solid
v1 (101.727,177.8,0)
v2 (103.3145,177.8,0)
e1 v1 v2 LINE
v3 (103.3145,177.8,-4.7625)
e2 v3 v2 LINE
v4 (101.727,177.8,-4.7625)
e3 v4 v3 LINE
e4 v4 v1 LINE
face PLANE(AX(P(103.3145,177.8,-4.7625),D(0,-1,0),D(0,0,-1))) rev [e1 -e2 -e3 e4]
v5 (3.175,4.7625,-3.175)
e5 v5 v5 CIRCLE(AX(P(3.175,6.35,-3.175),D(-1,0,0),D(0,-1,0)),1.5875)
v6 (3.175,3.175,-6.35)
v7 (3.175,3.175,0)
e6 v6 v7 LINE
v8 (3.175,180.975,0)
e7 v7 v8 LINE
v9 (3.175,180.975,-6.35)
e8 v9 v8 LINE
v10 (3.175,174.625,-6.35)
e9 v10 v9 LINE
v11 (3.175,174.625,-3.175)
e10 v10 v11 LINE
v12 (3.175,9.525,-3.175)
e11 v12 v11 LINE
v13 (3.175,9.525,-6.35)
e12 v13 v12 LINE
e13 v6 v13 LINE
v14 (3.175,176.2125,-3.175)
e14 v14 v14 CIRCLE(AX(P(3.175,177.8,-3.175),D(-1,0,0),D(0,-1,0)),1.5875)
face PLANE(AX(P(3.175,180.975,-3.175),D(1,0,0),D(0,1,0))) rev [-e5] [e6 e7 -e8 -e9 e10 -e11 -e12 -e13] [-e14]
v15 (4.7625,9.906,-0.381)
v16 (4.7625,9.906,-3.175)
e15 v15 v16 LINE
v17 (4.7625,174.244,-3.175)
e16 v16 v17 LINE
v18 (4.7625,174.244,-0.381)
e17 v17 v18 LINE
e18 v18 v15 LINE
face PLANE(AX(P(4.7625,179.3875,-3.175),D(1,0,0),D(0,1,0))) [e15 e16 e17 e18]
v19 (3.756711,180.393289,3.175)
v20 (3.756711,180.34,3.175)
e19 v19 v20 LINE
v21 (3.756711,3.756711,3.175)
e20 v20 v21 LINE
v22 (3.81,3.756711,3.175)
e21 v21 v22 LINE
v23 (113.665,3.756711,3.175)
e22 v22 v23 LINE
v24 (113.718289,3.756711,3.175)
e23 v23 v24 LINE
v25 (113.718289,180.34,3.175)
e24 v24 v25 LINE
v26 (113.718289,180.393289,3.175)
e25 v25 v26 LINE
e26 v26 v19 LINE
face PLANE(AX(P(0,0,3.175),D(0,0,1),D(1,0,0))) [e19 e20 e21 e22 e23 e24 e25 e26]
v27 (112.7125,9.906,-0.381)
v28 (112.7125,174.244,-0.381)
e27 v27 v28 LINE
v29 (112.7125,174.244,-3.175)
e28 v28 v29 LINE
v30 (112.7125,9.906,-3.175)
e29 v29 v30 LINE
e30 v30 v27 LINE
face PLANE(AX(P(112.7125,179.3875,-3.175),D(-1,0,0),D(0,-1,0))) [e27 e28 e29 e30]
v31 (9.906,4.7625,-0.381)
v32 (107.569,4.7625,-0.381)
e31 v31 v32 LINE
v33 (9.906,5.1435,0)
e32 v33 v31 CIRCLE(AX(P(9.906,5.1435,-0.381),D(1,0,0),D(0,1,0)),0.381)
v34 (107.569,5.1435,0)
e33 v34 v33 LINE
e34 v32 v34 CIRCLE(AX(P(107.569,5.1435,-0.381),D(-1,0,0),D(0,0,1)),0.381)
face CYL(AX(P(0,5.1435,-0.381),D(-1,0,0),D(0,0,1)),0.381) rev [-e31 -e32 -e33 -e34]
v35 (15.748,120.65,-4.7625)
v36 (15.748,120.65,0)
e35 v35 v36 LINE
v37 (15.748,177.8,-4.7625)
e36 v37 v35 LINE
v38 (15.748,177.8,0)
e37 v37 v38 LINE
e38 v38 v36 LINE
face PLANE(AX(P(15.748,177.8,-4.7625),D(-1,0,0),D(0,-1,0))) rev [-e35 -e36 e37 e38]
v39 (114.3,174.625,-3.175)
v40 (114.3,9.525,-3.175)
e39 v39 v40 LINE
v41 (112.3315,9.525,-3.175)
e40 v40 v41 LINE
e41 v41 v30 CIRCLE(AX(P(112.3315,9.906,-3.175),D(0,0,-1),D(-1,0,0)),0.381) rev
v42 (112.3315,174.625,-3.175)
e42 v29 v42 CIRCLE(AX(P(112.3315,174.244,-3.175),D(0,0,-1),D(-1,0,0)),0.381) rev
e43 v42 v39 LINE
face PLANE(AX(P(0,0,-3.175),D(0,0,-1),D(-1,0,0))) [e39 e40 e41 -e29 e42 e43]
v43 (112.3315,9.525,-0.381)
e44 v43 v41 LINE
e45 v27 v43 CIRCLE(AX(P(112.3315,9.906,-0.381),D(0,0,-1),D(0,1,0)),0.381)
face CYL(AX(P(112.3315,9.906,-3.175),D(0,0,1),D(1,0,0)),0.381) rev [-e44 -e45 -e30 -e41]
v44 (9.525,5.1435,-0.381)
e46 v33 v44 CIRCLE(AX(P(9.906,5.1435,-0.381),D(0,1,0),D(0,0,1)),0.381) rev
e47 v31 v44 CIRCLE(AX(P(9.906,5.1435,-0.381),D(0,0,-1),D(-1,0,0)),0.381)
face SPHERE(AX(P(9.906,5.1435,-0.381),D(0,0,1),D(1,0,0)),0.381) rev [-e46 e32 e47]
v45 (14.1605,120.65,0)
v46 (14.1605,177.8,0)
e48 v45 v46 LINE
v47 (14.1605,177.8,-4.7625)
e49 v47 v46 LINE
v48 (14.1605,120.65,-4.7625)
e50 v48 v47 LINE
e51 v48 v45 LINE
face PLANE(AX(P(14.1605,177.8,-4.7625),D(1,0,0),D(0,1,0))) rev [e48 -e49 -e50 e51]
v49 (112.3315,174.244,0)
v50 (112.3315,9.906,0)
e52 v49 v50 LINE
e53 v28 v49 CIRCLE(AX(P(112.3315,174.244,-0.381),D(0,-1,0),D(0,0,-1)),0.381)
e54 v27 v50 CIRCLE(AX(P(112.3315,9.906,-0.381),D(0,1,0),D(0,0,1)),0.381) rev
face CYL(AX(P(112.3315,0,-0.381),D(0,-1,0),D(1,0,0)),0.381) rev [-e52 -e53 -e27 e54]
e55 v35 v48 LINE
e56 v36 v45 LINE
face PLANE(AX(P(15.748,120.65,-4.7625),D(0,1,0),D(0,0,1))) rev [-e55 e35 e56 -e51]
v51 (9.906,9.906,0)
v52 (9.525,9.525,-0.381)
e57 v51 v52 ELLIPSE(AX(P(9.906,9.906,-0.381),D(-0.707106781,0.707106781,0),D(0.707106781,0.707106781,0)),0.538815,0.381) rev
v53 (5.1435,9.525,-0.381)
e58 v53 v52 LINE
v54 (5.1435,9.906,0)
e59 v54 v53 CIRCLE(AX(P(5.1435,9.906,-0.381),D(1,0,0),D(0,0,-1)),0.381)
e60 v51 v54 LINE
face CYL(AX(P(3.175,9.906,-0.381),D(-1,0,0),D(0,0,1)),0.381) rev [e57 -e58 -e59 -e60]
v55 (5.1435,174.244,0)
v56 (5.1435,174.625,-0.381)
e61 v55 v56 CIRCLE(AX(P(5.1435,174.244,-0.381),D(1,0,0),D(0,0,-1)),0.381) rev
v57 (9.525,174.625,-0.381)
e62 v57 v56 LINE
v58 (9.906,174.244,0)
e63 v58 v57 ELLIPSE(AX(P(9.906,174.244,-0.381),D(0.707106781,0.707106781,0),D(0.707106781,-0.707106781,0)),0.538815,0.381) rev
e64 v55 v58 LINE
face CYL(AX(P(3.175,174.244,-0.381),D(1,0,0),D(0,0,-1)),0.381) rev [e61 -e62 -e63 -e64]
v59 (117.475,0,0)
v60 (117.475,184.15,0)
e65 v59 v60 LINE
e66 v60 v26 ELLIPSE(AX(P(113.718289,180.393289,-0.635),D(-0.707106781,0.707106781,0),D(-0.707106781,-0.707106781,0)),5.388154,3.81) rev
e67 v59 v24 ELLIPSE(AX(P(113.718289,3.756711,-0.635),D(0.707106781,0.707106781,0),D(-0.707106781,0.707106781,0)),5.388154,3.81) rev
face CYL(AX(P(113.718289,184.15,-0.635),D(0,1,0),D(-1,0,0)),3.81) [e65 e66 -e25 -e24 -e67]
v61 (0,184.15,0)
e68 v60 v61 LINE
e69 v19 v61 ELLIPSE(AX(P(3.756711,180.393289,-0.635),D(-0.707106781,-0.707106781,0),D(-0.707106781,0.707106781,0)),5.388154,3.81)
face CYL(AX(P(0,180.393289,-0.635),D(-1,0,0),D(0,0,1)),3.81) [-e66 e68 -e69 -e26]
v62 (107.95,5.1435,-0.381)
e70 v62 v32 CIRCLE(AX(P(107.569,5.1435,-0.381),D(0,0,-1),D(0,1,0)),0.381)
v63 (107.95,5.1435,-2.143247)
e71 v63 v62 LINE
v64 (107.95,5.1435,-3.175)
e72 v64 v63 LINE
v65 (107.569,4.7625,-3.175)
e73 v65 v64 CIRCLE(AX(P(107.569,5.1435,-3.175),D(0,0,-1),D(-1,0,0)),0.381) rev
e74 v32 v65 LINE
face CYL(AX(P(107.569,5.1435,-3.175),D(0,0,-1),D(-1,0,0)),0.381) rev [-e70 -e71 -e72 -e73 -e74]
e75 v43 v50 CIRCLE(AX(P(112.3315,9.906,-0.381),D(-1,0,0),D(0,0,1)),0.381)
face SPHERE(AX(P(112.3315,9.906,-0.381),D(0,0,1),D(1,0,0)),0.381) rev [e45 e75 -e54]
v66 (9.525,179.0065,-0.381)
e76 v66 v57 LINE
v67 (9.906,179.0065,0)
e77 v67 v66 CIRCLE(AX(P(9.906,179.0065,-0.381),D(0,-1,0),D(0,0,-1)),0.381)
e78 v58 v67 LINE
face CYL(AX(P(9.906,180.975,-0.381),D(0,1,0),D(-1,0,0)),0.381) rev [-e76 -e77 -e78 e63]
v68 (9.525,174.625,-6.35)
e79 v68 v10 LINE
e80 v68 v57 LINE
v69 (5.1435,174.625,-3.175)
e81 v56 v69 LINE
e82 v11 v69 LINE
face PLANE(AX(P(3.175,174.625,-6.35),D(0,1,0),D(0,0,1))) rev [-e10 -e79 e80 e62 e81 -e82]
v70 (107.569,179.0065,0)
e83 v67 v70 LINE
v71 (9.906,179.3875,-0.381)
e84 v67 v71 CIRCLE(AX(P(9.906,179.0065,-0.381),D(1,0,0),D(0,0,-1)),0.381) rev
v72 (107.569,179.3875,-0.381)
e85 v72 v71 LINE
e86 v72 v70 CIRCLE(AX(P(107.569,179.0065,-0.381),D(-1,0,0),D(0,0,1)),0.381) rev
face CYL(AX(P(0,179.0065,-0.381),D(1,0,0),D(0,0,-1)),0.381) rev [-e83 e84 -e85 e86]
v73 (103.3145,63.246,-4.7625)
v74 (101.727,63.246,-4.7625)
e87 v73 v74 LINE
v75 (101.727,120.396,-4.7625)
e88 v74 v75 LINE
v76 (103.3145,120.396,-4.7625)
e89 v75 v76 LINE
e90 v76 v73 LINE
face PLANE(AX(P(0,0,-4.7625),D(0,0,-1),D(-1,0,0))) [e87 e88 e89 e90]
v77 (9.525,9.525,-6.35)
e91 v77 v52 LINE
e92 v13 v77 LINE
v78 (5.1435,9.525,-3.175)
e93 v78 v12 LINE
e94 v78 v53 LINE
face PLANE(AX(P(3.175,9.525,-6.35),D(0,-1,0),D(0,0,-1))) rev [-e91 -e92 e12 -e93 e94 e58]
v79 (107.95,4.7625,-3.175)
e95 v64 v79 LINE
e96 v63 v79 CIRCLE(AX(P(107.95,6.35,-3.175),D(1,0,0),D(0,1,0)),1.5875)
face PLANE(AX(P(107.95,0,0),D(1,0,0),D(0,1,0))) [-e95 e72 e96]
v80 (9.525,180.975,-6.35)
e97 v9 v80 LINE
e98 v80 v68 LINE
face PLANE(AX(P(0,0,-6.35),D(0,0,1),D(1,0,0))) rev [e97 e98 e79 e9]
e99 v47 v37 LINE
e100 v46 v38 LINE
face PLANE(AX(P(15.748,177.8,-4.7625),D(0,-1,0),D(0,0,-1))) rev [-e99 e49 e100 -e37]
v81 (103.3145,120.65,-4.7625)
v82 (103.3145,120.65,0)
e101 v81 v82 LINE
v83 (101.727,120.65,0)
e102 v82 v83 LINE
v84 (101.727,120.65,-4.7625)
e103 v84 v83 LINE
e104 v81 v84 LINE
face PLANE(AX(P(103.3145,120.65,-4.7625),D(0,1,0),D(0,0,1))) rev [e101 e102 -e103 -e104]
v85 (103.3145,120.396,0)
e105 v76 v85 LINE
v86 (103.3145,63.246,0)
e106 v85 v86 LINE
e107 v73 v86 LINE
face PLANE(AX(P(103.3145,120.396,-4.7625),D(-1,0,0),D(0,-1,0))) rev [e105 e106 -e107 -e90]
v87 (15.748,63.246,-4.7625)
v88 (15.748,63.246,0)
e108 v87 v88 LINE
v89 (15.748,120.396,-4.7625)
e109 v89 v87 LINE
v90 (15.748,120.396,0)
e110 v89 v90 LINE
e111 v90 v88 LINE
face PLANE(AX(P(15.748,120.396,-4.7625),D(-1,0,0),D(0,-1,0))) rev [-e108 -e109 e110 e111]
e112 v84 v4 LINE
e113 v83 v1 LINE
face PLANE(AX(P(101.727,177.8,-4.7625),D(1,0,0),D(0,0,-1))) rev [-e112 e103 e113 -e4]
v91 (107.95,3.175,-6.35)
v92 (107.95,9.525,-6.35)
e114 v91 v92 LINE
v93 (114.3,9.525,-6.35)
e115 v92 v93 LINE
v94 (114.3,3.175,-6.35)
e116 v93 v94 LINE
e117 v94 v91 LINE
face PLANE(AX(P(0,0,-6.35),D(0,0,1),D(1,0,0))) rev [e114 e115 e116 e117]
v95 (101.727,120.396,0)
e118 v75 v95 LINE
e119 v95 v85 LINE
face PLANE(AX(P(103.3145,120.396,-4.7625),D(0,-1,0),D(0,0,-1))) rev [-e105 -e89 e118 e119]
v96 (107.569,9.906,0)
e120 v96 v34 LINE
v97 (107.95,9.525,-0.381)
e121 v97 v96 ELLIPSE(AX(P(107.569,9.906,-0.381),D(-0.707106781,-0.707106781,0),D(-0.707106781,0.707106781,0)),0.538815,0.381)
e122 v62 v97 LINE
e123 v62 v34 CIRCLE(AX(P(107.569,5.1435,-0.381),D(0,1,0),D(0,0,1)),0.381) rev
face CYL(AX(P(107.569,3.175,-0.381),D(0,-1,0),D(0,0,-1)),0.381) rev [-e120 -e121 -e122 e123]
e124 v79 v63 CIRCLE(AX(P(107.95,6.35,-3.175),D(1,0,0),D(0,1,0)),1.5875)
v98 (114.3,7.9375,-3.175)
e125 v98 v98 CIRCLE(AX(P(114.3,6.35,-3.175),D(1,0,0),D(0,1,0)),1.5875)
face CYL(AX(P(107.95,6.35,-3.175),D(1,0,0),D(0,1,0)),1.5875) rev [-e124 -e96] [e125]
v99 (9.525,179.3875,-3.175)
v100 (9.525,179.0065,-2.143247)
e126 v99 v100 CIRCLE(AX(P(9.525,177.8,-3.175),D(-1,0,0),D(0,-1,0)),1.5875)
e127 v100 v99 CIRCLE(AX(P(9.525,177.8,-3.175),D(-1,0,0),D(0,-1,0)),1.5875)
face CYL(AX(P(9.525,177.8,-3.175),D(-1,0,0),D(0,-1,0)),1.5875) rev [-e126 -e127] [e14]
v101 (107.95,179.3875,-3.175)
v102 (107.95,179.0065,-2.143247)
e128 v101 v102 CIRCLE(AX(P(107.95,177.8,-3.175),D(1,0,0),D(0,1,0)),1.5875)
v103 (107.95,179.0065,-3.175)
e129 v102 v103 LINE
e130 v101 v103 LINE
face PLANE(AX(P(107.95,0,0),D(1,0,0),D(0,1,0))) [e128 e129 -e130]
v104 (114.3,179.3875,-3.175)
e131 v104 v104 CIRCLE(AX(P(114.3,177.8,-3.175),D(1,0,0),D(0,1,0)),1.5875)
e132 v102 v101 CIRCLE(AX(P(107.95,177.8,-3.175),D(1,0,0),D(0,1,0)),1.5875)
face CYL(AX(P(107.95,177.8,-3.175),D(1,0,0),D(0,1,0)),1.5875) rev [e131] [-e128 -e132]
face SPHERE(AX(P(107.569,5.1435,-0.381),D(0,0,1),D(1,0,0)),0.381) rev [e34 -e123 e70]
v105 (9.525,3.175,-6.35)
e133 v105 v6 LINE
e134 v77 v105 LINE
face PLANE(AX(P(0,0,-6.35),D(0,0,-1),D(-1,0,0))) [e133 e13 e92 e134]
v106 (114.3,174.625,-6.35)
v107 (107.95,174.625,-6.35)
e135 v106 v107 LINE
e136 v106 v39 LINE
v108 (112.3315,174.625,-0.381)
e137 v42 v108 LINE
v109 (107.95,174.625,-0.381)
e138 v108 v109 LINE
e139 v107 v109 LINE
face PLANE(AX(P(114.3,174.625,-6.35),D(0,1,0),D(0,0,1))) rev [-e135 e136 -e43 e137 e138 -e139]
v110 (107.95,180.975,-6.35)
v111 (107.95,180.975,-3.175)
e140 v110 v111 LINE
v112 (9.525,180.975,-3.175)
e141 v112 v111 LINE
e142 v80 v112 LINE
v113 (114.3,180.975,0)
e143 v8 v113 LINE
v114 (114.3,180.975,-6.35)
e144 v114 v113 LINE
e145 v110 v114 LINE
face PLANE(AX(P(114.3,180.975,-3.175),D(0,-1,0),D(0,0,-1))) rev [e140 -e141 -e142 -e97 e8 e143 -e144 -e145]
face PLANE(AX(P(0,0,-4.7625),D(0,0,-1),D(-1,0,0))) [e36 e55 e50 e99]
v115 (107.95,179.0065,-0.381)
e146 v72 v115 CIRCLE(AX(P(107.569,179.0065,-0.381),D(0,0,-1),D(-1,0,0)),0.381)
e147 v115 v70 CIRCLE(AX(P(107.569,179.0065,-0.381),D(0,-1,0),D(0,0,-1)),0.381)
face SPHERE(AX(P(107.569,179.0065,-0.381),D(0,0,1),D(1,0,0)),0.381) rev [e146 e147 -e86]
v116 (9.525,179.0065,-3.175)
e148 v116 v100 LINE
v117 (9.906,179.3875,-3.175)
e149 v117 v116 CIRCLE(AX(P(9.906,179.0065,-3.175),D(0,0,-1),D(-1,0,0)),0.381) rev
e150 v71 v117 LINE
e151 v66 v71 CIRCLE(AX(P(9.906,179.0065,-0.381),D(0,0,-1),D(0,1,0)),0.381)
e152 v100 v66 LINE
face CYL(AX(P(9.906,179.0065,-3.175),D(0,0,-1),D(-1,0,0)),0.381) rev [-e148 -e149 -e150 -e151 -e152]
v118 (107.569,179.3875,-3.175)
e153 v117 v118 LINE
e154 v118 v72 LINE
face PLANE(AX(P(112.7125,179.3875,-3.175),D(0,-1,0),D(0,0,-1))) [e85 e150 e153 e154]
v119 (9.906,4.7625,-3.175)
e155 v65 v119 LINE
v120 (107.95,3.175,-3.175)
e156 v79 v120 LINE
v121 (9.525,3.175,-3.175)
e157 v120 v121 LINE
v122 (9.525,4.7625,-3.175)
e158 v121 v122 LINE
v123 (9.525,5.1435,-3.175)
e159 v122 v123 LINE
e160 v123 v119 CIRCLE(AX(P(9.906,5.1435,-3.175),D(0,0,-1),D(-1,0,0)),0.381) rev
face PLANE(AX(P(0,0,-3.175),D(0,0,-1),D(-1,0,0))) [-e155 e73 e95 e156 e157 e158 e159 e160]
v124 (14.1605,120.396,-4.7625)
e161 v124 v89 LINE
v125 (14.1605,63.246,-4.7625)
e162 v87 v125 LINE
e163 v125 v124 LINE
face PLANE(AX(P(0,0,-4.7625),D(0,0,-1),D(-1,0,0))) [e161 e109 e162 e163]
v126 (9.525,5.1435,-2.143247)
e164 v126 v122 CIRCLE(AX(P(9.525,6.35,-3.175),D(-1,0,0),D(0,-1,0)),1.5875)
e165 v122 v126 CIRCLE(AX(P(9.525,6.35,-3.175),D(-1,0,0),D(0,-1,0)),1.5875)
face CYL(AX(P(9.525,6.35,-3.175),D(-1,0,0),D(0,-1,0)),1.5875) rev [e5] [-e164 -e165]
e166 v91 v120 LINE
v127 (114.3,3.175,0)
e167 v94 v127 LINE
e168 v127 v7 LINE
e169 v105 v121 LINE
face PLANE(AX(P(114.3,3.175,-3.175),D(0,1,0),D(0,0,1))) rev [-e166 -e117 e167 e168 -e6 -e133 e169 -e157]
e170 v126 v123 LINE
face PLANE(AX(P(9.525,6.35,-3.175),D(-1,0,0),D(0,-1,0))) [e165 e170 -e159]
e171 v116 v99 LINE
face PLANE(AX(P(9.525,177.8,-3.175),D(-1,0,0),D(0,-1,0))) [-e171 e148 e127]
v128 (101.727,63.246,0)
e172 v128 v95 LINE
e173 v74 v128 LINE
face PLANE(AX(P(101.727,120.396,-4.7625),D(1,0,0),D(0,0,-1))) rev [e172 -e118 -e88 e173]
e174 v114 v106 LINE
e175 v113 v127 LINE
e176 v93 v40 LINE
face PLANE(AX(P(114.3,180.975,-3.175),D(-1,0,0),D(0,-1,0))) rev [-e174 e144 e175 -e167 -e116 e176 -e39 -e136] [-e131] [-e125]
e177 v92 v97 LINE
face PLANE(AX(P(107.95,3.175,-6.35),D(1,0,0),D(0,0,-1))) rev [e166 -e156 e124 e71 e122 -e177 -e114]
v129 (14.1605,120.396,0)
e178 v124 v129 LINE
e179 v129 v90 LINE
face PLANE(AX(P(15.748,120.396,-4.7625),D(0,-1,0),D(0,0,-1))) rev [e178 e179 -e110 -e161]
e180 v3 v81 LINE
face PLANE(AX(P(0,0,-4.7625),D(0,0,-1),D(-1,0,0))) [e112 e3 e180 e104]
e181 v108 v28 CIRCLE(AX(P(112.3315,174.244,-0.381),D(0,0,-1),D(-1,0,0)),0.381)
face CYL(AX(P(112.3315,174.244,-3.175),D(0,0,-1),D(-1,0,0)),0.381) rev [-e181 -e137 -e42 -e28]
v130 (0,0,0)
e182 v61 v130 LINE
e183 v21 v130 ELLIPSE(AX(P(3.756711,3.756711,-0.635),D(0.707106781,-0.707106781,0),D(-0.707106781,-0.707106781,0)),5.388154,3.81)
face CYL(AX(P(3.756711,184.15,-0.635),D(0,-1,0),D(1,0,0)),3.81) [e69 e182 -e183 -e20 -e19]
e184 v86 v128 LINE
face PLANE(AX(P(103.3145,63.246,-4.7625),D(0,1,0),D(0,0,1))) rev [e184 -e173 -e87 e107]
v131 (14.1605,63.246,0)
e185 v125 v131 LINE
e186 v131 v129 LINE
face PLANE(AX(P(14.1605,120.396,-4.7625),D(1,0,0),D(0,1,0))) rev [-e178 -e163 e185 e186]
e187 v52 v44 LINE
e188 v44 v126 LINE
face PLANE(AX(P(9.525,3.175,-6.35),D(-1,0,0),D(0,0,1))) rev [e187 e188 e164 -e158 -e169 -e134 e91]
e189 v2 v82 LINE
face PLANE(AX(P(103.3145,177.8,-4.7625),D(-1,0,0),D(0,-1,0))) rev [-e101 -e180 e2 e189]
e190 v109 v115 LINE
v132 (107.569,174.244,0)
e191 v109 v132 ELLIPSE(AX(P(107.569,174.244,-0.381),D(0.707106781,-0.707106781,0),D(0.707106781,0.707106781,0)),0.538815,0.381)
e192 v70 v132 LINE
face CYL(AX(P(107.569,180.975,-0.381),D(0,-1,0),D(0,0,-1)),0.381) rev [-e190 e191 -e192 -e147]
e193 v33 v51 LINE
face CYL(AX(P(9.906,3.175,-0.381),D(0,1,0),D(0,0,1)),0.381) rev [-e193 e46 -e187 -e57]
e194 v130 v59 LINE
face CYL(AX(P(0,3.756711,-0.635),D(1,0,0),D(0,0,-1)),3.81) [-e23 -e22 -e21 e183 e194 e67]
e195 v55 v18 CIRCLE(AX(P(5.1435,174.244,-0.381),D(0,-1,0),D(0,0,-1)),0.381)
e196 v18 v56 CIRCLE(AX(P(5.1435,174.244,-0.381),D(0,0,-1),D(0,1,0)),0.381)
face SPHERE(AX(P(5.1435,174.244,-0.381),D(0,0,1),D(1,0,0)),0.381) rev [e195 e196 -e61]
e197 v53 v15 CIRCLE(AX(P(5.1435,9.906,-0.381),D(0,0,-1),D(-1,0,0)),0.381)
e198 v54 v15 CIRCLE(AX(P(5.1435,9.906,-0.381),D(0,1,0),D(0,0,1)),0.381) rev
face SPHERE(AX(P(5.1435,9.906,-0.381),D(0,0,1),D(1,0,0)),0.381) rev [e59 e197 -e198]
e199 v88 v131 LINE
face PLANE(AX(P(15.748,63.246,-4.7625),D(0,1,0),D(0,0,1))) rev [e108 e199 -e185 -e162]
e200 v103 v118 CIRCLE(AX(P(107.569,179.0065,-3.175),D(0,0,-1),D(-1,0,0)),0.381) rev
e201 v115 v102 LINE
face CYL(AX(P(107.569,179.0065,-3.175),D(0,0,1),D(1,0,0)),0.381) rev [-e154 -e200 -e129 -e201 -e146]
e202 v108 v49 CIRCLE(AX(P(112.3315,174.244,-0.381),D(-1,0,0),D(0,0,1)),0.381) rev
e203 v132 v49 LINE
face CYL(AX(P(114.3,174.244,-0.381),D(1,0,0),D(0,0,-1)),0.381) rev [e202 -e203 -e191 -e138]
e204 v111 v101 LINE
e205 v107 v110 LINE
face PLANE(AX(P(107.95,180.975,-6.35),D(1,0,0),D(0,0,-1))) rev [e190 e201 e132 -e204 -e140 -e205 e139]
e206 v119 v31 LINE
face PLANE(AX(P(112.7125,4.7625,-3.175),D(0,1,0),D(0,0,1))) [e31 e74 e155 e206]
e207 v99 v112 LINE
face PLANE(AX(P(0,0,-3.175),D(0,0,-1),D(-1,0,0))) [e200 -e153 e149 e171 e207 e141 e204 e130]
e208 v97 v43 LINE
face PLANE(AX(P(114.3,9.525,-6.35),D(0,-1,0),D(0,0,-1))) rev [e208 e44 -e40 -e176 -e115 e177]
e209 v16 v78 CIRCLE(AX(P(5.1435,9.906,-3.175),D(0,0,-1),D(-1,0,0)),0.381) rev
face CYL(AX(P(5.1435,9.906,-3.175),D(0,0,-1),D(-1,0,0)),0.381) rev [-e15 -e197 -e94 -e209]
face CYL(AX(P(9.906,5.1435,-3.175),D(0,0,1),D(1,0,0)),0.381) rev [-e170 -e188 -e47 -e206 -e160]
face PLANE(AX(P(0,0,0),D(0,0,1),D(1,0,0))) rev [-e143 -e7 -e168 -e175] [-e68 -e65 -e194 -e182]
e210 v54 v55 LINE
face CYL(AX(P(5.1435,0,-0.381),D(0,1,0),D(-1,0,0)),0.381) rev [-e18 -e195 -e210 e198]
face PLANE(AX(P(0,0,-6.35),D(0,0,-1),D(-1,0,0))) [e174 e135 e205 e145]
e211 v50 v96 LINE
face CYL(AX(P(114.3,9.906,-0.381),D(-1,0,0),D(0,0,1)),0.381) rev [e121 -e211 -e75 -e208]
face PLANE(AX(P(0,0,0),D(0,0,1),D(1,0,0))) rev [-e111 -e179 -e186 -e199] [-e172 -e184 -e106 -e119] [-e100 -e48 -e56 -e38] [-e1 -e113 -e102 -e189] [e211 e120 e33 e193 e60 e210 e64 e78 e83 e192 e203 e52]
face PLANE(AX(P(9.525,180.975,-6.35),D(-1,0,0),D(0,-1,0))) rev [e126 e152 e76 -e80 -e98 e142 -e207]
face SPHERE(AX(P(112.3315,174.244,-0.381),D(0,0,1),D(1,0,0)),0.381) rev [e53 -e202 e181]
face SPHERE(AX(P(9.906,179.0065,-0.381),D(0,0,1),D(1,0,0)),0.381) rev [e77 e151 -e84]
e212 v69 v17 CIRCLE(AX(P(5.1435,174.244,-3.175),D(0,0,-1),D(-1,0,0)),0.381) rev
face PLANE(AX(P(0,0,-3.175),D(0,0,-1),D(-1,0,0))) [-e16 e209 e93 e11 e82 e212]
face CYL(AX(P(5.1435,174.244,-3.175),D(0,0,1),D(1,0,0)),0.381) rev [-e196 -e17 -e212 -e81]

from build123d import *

# Parameters (mm, degrees)
SKETCH3_W           = 117.475
SKETCH3_H           = 184.15
BOSS_EXTRUDE2_DEPTH = 3.175
FILLET1_R           = 3.81
SKETCH13_W          = 111.125
SKETCH13_H          = 177.8
SKETCH13_W_2        = 107.95
SKETCH13_H_2        = 174.625
BOSS_EXTRUDE4_DEPTH = 3.175
SKETCH14_W          = 6.35
SKETCH14_H          = 6.35
BOSS_EXTRUDE5_DEPTH = 6.35
FILLET9_R           = 0.381
SKETCH15_R          = 1.5875
CUT_EXTRUDE9_DEPTH  = 6.35
CUT_EXTRUDE10_START = -6.35
SKETCH16_R          = 1.5875
CUT_EXTRUDE10_DEPTH = 6.35
SKETCH17_W          = 1.5875
SKETCH17_H          = 57.15
BOSS_EXTRUDE6_DEPTH = 4.7625
SKETCH18_W          = 1.5875
SKETCH18_H          = 57.15
BOSS_EXTRUDE7_DEPTH = 4.7625


with BuildPart() as part:
    # Sketch3 → Boss-Extrude2 (new body)
    with BuildSketch(Plane.XY):
        with Locations((58.7375, 92.075)):
            Rectangle(SKETCH3_W, SKETCH3_H)
    extrude(amount=BOSS_EXTRUDE2_DEPTH)

    # Fillet1
    # the kernel refuses this fillet: 3.81 mm, written as the material it takes off along each edge
    with BuildSketch(Plane(origin=(126.866776656, 0, 3.175), x_dir=(0, 0, -1), z_dir=(-1, 0, 0)), Plane(origin=(-9.391776656, 184.15, 3.175), x_dir=(0, 0, -1), z_dir=(1, 0, 0))) as fillet1_piece_1:
        with BuildLine():
            CenterArc((3.81, -3.756710662), FILLET1_R, 99.594068227, 80.405931773)
            Line((0, -3.756710662), (-0.0762, -3.756710662))
            Line((-0.0762, -3.756710662), (-0.0762, 0))
            Line((-0.0762, 0), (0, 0.0762))
            ThreePointArc((0, 0.0762), (1.5875, 0.0762), (3.1623, 0.075134213))
            Line((3.1623, 0.075134213), (3.175, 0))
        make_face()
    extrude(amount=136.258553311, mode=Mode.SUBTRACT)
    with BuildSketch(Plane(origin=(117.475, 193.541776656, 3.175), x_dir=(0, 0, -1), z_dir=(0, -1, 0)), Plane(origin=(0, -9.391776656, 3.175), x_dir=(0, 0, -1), z_dir=(0, 1, 0))) as fillet1_piece_2:
        with BuildLine():
            CenterArc((3.81, -3.756710662), FILLET1_R, 99.594068227, 80.405931773)
            Line((0, -3.756710662), (-0.0762, -3.756710662))
            Line((-0.0762, -3.756710662), (-0.0762, 0))
            Line((-0.0762, 0), (0, 0.0762))
            ThreePointArc((0, 0.0762), (1.5875, 0.0762), (3.1623, 0.075134213))
            Line((3.1623, 0.075134213), (3.175, 0))
        make_face()
    extrude(amount=202.933553311, mode=Mode.SUBTRACT)

    # Sketch13 → Boss-Extrude4 (add)
    with BuildSketch(Plane(origin=(0, 0, 0), x_dir=(-1, 0, 0), z_dir=(0, 0, -1))):
        with Locations((-58.7375, 92.075)):
            Rectangle(SKETCH13_W, SKETCH13_H)
        with Locations((-58.7375, 92.075)):
            Rectangle(SKETCH13_W_2, SKETCH13_H_2, mode=Mode.SUBTRACT)
    extrude(amount=BOSS_EXTRUDE4_DEPTH)

    # Sketch14 → Boss-Extrude5 (add)
    with BuildSketch(Plane(origin=(0, 0, 0), x_dir=(-1, 0, 0), z_dir=(0, 0, -1))):
        with Locations((-111.125, 177.8)):
            Rectangle(SKETCH14_W, SKETCH14_H)
        with Locations((-6.35, 177.8)):
            Rectangle(SKETCH14_W, SKETCH14_H)
        with Locations((-111.125, 6.35)):
            Rectangle(SKETCH14_W, SKETCH14_H)
        with Locations((-6.35, 6.35)):
            Rectangle(SKETCH14_W, SKETCH14_H)
    extrude(amount=BOSS_EXTRUDE5_DEPTH)

    # Fillet9
    fillet9_edges = [part.edges().sort_by_distance(p)[0] for p in [
        (107.95, 7.14375, 0),
        (110.33125, 9.525, 0),
        (4.7625, 92.075, 0),
        (9.525, 4.7625, -1.5875),
        (4.7625, 9.525, -1.5875),
        (7.14375, 9.525, 0),
        (9.525, 7.14375, 0),
        (112.7125, 92.075, 0),
        (110.33125, 174.625, 0),
        (112.7125, 174.625, -1.5875),
        (107.95, 179.3875, -1.5875),
        (107.95, 177.00625, 0),
        (4.7625, 174.625, -1.5875),
        (58.7375, 179.3875, 0),
        (9.525, 179.3875, -1.5875),
        (9.525, 177.00625, 0),
        (7.14375, 174.625, 0),
        (58.7375, 4.7625, 0),
        (107.95, 4.7625, -1.5875),
        (112.7125, 9.525, -1.5875),
    ]]
    fillet(fillet9_edges, radius=FILLET9_R)

    # Sketch15 → Cut-Extrude9 (cut)
    with BuildSketch(Plane(origin=(114.3, 0, 0), x_dir=(0, 0, -1), z_dir=(1, 0, 0))):
        with Locations(Location((3.175, 6.35, 0), (0, 0, 90))):
            Circle(SKETCH15_R)
        with Locations(Location((3.175, 177.8, 0), (0, 0, 90))):
            Circle(SKETCH15_R)
    extrude(amount=-CUT_EXTRUDE9_DEPTH, mode=Mode.SUBTRACT)

    # Sketch16 → Cut-Extrude10 (cut)
    with BuildSketch(Plane.ZY.offset(-3.175).offset(CUT_EXTRUDE10_START)):
        with Locations(Location((-3.175, 177.8, 0), (0, 0, 90))):
            Circle(SKETCH16_R)
        with Locations(Location((-3.175, 6.35, 0), (0, 0, 90))):
            Circle(SKETCH16_R)
    extrude(amount=CUT_EXTRUDE10_DEPTH, mode=Mode.SUBTRACT)

    # Sketch17 → Boss-Extrude6 (add)
    with BuildSketch(Plane(origin=(0, 0, 0), x_dir=(-1, 0, 0), z_dir=(0, 0, -1))):
        with Locations((-102.52075, 149.225)):
            Rectangle(SKETCH17_W, SKETCH17_H)
        with Locations((-14.95425, 149.225)):
            Rectangle(SKETCH17_W, SKETCH17_H)
    extrude(amount=BOSS_EXTRUDE6_DEPTH)

    # Sketch18 → Boss-Extrude7 (add)
    with BuildSketch(Plane(origin=(0, 0, 0), x_dir=(-1, 0, 0), z_dir=(0, 0, -1))):
        with Locations((-102.52075, 91.821)):
            Rectangle(SKETCH18_W, SKETCH18_H)
        with Locations((-14.95425, 91.821)):
            Rectangle(SKETCH18_W, SKETCH18_H)
    extrude(amount=BOSS_EXTRUDE7_DEPTH)


solid = part.part
